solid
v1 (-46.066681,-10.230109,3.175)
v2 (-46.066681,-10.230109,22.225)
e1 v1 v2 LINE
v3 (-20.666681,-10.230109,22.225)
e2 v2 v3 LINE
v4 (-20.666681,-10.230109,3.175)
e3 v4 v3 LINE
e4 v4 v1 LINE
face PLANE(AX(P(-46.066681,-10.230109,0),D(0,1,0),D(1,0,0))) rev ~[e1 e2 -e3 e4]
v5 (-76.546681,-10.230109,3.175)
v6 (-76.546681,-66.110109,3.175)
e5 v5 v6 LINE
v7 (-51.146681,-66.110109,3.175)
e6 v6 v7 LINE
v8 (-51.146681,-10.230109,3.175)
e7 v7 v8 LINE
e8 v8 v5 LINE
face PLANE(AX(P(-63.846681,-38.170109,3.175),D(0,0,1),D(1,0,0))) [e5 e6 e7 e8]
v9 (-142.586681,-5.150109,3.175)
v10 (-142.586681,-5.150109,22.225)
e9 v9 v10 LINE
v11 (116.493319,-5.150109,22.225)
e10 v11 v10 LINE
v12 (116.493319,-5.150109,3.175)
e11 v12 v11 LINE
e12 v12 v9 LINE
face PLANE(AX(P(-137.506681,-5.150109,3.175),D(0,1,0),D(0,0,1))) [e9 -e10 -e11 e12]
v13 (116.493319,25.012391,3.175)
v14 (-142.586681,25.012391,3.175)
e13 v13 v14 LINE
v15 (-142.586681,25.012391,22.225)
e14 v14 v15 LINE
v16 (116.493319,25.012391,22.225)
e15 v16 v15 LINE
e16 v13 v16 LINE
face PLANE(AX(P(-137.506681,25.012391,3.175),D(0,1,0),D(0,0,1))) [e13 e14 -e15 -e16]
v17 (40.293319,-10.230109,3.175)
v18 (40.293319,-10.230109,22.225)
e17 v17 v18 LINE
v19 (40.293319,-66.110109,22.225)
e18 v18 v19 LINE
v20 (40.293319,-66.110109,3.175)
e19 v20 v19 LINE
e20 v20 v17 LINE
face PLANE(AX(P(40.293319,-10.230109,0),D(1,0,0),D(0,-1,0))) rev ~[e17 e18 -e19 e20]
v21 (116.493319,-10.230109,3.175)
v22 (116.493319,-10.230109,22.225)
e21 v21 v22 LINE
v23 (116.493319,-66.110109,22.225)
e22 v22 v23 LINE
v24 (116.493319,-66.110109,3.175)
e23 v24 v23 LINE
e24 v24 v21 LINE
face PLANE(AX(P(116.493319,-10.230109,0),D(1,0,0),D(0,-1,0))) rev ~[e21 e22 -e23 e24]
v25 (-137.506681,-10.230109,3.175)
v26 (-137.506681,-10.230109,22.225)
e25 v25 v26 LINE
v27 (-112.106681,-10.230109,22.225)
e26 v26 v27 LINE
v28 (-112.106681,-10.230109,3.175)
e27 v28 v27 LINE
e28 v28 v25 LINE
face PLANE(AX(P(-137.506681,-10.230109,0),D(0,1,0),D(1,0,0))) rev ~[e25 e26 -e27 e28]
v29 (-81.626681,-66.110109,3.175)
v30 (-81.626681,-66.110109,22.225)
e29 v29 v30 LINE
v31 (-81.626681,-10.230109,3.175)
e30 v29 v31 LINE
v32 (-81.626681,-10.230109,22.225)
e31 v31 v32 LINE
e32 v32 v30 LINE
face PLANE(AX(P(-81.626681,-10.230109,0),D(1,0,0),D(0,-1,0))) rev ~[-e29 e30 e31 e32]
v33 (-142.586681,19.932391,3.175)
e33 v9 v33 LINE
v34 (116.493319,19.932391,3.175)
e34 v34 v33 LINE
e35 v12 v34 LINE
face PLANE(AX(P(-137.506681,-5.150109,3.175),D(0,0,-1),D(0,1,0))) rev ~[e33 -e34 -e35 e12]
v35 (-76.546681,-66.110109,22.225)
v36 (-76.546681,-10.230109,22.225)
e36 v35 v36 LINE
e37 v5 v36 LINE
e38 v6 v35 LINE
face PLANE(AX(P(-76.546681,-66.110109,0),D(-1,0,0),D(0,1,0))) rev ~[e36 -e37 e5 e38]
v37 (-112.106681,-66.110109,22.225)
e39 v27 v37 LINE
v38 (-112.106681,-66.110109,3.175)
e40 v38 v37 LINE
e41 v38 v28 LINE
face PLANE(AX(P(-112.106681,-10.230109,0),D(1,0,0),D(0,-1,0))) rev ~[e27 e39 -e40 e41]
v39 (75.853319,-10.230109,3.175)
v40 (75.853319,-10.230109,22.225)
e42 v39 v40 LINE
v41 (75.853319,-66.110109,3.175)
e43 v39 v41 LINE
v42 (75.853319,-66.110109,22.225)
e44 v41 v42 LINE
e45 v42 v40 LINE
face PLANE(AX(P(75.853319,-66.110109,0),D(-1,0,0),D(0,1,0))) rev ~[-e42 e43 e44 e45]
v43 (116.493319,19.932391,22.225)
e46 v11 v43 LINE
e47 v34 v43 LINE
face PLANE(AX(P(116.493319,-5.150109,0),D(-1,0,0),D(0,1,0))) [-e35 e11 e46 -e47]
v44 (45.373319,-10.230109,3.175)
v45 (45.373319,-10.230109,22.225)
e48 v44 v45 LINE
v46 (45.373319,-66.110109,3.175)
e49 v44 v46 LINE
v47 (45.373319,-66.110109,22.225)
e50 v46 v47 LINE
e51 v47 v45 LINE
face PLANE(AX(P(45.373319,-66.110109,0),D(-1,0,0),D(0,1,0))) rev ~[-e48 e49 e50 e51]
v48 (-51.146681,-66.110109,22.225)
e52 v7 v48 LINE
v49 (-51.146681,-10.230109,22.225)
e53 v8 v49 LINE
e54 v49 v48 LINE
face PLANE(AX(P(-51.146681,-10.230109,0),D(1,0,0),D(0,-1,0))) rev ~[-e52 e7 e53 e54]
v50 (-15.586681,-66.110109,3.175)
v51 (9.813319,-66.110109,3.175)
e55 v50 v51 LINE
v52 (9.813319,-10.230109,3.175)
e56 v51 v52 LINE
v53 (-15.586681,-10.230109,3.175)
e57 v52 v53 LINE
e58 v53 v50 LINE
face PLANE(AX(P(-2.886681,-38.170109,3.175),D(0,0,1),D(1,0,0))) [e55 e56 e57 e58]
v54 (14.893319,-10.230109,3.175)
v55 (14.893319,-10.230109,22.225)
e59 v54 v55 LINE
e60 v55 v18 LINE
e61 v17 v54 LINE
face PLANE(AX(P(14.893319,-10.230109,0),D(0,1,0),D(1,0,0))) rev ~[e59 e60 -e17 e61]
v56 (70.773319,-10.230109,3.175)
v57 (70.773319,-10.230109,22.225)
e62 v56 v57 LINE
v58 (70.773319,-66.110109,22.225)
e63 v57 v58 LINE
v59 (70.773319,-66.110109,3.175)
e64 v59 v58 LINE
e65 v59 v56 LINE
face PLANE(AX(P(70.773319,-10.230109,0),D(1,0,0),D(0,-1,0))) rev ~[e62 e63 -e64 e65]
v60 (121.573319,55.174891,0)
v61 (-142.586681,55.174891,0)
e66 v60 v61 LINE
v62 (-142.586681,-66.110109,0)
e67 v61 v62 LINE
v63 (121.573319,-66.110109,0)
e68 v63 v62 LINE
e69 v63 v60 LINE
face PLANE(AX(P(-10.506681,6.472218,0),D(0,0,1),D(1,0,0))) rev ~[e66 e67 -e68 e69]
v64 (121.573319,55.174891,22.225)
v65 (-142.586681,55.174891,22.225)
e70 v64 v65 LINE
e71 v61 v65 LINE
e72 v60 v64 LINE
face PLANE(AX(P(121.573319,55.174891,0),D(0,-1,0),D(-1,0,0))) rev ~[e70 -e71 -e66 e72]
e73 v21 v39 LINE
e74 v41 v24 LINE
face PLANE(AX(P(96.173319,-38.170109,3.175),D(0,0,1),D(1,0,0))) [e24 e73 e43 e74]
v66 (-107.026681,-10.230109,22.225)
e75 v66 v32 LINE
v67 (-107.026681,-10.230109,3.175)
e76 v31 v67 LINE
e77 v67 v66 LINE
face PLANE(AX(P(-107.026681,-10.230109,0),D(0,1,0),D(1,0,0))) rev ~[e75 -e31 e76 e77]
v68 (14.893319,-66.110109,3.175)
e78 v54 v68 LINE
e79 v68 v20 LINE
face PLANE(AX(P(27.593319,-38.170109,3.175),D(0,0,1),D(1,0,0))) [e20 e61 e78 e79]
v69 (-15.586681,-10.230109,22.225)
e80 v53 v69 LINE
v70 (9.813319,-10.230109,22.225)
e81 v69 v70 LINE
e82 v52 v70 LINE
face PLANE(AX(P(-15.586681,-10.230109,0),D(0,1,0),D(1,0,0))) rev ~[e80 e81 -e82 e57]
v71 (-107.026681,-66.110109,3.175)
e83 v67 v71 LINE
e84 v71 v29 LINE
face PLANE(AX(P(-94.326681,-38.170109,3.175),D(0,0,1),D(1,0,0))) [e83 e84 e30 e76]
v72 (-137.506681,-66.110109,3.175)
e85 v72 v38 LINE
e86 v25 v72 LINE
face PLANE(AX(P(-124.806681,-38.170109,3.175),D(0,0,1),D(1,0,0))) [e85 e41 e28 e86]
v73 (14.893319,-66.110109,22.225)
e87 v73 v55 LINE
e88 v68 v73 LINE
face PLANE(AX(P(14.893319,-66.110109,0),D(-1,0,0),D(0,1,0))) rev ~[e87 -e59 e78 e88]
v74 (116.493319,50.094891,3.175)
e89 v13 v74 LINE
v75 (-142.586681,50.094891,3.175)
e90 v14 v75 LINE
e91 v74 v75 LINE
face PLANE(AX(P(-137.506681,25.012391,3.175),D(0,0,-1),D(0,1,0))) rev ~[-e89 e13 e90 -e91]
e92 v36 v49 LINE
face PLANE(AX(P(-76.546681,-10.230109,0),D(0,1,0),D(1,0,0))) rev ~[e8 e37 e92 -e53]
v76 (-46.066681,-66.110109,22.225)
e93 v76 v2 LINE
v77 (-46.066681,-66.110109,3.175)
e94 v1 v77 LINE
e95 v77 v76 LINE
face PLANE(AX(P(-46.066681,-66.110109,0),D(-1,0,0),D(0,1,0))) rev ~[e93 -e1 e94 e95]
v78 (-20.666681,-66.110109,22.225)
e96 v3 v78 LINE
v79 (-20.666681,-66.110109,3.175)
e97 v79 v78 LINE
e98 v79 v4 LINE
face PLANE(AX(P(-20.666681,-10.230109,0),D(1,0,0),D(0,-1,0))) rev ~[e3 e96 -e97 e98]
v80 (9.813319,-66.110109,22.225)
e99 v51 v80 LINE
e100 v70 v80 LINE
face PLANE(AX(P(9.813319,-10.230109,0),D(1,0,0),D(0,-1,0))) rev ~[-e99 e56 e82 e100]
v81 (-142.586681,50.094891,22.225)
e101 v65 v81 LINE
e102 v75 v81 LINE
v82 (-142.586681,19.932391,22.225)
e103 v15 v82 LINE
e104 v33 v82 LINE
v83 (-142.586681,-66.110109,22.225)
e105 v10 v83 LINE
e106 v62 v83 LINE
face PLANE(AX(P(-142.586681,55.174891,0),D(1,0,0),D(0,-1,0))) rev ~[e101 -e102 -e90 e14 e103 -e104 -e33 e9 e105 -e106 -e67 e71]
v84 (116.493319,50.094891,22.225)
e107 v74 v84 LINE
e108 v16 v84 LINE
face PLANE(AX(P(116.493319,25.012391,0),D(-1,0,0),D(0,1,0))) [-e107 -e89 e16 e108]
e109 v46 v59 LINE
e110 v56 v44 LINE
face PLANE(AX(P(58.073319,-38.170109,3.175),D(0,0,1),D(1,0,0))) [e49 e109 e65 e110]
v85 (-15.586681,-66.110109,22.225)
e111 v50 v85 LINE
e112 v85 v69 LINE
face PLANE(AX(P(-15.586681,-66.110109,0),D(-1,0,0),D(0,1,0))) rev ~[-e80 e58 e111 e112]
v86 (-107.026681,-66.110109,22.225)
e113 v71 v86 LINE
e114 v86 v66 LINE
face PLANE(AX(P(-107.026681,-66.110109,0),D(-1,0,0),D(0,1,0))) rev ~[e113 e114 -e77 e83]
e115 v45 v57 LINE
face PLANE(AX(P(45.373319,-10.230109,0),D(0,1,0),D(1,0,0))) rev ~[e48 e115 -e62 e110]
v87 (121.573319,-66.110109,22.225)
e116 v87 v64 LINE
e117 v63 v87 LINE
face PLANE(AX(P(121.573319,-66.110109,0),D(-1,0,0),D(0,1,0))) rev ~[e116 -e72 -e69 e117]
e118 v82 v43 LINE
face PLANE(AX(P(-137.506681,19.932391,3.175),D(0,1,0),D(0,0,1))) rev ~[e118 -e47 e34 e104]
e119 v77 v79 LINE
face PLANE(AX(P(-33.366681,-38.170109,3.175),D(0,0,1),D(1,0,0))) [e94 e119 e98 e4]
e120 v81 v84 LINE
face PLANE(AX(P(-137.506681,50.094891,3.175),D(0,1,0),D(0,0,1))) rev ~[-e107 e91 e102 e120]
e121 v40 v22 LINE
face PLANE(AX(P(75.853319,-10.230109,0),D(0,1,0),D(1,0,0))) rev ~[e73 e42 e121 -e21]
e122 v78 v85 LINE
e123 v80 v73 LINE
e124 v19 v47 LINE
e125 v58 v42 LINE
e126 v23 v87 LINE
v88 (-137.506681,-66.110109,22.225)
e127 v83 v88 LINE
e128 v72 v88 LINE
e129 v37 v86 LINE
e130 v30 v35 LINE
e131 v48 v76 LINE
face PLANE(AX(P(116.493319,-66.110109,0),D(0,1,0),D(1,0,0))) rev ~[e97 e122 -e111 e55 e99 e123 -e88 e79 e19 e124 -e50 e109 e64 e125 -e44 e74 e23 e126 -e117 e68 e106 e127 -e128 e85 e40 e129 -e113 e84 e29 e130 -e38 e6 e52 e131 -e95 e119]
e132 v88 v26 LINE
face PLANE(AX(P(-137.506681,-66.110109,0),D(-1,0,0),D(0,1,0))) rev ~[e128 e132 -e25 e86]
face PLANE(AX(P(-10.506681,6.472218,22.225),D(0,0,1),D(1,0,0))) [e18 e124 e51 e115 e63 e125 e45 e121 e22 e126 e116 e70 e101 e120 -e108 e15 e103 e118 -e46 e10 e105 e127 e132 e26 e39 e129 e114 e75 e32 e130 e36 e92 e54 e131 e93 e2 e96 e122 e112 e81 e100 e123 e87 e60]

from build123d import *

# Parameters (mm, degrees)
F0_W     = 254
F0_H     = 25.0825
F1_DEPTH = 3.175
F2_DEPTH = 22.225
F3_DEPTH = 25.4


# Not quite as in the source:
# - a feature names something its author has since deleted; it is built from what else it names


with BuildPart() as f1:
    # F0 (on Top) → F1 (new body)
    with BuildSketch(Plane.XY):
        with Locations((-10.5066807906, 37.553641122)):
            Rectangle(F0_W, F0_H)
    extrude(amount=F1_DEPTH)



with BuildPart() as f1b:
    # F0 (on Top) → F1, piece 2 (new body)
    with BuildSketch(Plane.XY):
        with Locations((-10.5066807906, 7.391141122)):
            Rectangle(F0_W, F0_H)
    extrude(amount=F1_DEPTH)


with BuildPart() as f1c:
    # F0 (on Top) → F1, piece 3 (new body)
    with BuildSketch(Plane.XY):
        Polygon((-137.5066807906, -61.030108878), (-137.5066807906, -66.110108878), (-112.1066807906, -66.110108878), (-112.1066807906, -61.030108878), (-112.1066807906, -10.230108878), (-137.5066807906, -10.230108878), align=None)
    extrude(amount=F1_DEPTH)


with BuildPart() as f1d:
    # F0 (on Top) → F1, piece 4 (new body)
    with BuildSketch(Plane.XY):
        Polygon((-107.0266807906, -61.030108878), (-107.0266807906, -66.110108878), (-81.6266807906, -66.110108878), (-81.6266807906, -61.030108878), (-81.6266807906, -10.230108878), (-107.0266807906, -10.230108878), align=None)
    extrude(amount=F1_DEPTH)


with BuildPart() as f1e:
    # F0 (on Top) → F1, piece 5 (new body)
    with BuildSketch(Plane.XY):
        Polygon((-76.5466807906, -61.030108878), (-76.5466807906, -66.110108878), (-51.1466807906, -66.110108878), (-51.1466807906, -61.030108878), (-51.1466807906, -10.230108878), (-76.5466807906, -10.230108878), align=None)
    extrude(amount=F1_DEPTH)


with BuildPart() as f1f:
    # F0 (on Top) → F1, piece 6 (new body)
    with BuildSketch(Plane.XY):
        Polygon((-46.0666807906, -61.030108878), (-46.0666807906, -66.110108878), (-20.6666807906, -66.110108878), (-20.6666807906, -61.030108878), (-20.6666807906, -10.230108878), (-46.0666807906, -10.230108878), align=None)
    extrude(amount=F1_DEPTH)


with BuildPart() as f1g:
    # F0 (on Top) → F1, piece 7 (new body)
    with BuildSketch(Plane.XY):
        Polygon((-15.5866807906, -66.110108878), (9.8133192094, -66.110108878), (9.8133192094, -61.030108878), (9.8133192094, -10.230108878), (-15.5866807906, -10.230108878), (-15.5866807906, -61.030108878), align=None)
    extrude(amount=F1_DEPTH)


with BuildPart() as f1h:
    # F0 (on Top) → F1, piece 8 (new body)
    with BuildSketch(Plane.XY):
        Polygon((14.8933192094, -66.110108878), (40.2933192094, -66.110108878), (40.2933192094, -61.030108878), (40.2933192094, -10.230108878), (14.8933192094, -10.230108878), (14.8933192094, -61.030108878), align=None)
    extrude(amount=F1_DEPTH)


with BuildPart() as f1i:
    # F0 (on Top) → F1, piece 9 (new body)
    with BuildSketch(Plane.XY):
        Polygon((45.3733192094, -66.110108878), (70.7733192094, -66.110108878), (70.7733192094, -61.030108878), (70.7733192094, -10.230108878), (45.3733192094, -10.230108878), (45.3733192094, -61.030108878), align=None)
    extrude(amount=F1_DEPTH)


with BuildPart() as f1j:
    # F0 (on Top) → F1, piece 10 (new body)
    with BuildSketch(Plane.XY):
        Polygon((75.8533192094, -66.110108878), (116.4933192094, -66.110108878), (116.4933192094, -61.030108878), (116.4933192094, -10.230108878), (75.8533192094, -10.230108878), (75.8533192094, -61.030108878), align=None)
    extrude(amount=F1_DEPTH)


with BuildPart() as f1_1:
    add(f1.part)

    add(f1b.part)  # F2 merges F1b

    add(f1c.part)  # F2 merges F1c

    add(f1d.part)  # F2 merges F1d

    add(f1e.part)  # F2 merges F1e

    add(f1f.part)  # F2 merges F1f

    add(f1g.part)  # F2 merges F1g

    add(f1h.part)  # F2 merges F1h

    add(f1i.part)  # F2 merges F1i

    add(f1j.part)  # F2 merges F1j
    # F0 (on Top) → F2 (join)
    with BuildSketch(Plane.XY):
        Polygon((121.5733192094, 55.174891122), (-142.5866807906, 55.174891122), (-142.5866807906, -66.110108878), (-137.5066807906, -66.110108878), (-137.5066807906, -61.030108878), (-137.5066807906, -10.230108878), (-112.1066807906, -10.230108878), (-107.0266807906, -10.230108878), (-81.6266807906, -10.230108878), (-76.5466807906, -10.230108878), (-51.1466807906, -10.230108878), (-46.0666807906, -10.230108878), (-20.6666807906, -10.230108878), (-15.5866807906, -10.230108878), (9.8133192094, -10.230108878), (14.8933192094, -10.230108878), (40.2933192094, -10.230108878), (45.3733192094, -10.230108878), (70.7733192094, -10.230108878), (75.8533192094, -10.230108878), (116.4933192094, -10.230108878), (116.4933192094, -61.030108878), (116.4933192094, -66.110108878), (121.5733192094, -66.110108878), align=None)
        with Locations((-10.5066807906, 7.391141122)):
            Rectangle(F0_W, F0_H, mode=Mode.SUBTRACT)
        with Locations((-10.5066807906, 37.553641122)):
            Rectangle(F0_W, F0_H, mode=Mode.SUBTRACT)
        Polygon((-112.1066807906, -61.030108878), (-112.1066807906, -66.110108878), (-107.0266807906, -66.110108878), (-107.0266807906, -61.030108878), (-107.0266807906, -10.230108878), (-112.1066807906, -10.230108878), align=None)
        Polygon((-81.6266807906, -61.030108878), (-81.6266807906, -66.110108878), (-76.5466807906, -66.110108878), (-76.5466807906, -61.030108878), (-76.5466807906, -10.230108878), (-81.6266807906, -10.230108878), align=None)
        Polygon((-51.1466807906, -61.030108878), (-51.1466807906, -66.110108878), (-46.0666807906, -66.110108878), (-46.0666807906, -61.030108878), (-46.0666807906, -10.230108878), (-51.1466807906, -10.230108878), align=None)
        Polygon((-20.6666807906, -61.030108878), (-20.6666807906, -66.110108878), (-15.5866807906, -66.110108878), (-15.5866807906, -61.030108878), (-15.5866807906, -10.230108878), (-20.6666807906, -10.230108878), align=None)
        Polygon((9.8133192094, -66.110108878), (14.8933192094, -66.110108878), (14.8933192094, -61.030108878), (14.8933192094, -10.230108878), (9.8133192094, -10.230108878), (9.8133192094, -61.030108878), align=None)
        Polygon((40.2933192094, -66.110108878), (45.3733192094, -66.110108878), (45.3733192094, -61.030108878), (45.3733192094, -10.230108878), (40.2933192094, -10.230108878), (40.2933192094, -61.030108878), align=None)
        Polygon((70.7733192094, -66.110108878), (75.8533192094, -66.110108878), (75.8533192094, -61.030108878), (75.8533192094, -10.230108878), (70.7733192094, -10.230108878), (70.7733192094, -61.030108878), align=None)
    extrude(amount=F2_DEPTH)

    # F3 (cut): faces of the model
    f3_faces = [f1_1.faces().sort_by_distance(p)[0] for p in [
        (-137.5066807906, 7.391141122, 12.7),
        (-137.5066807906, 37.553641122, 12.7),
    ]]
    extrude(f3_faces, amount=-F3_DEPTH, mode=Mode.SUBTRACT)


solid = f1_1.part
